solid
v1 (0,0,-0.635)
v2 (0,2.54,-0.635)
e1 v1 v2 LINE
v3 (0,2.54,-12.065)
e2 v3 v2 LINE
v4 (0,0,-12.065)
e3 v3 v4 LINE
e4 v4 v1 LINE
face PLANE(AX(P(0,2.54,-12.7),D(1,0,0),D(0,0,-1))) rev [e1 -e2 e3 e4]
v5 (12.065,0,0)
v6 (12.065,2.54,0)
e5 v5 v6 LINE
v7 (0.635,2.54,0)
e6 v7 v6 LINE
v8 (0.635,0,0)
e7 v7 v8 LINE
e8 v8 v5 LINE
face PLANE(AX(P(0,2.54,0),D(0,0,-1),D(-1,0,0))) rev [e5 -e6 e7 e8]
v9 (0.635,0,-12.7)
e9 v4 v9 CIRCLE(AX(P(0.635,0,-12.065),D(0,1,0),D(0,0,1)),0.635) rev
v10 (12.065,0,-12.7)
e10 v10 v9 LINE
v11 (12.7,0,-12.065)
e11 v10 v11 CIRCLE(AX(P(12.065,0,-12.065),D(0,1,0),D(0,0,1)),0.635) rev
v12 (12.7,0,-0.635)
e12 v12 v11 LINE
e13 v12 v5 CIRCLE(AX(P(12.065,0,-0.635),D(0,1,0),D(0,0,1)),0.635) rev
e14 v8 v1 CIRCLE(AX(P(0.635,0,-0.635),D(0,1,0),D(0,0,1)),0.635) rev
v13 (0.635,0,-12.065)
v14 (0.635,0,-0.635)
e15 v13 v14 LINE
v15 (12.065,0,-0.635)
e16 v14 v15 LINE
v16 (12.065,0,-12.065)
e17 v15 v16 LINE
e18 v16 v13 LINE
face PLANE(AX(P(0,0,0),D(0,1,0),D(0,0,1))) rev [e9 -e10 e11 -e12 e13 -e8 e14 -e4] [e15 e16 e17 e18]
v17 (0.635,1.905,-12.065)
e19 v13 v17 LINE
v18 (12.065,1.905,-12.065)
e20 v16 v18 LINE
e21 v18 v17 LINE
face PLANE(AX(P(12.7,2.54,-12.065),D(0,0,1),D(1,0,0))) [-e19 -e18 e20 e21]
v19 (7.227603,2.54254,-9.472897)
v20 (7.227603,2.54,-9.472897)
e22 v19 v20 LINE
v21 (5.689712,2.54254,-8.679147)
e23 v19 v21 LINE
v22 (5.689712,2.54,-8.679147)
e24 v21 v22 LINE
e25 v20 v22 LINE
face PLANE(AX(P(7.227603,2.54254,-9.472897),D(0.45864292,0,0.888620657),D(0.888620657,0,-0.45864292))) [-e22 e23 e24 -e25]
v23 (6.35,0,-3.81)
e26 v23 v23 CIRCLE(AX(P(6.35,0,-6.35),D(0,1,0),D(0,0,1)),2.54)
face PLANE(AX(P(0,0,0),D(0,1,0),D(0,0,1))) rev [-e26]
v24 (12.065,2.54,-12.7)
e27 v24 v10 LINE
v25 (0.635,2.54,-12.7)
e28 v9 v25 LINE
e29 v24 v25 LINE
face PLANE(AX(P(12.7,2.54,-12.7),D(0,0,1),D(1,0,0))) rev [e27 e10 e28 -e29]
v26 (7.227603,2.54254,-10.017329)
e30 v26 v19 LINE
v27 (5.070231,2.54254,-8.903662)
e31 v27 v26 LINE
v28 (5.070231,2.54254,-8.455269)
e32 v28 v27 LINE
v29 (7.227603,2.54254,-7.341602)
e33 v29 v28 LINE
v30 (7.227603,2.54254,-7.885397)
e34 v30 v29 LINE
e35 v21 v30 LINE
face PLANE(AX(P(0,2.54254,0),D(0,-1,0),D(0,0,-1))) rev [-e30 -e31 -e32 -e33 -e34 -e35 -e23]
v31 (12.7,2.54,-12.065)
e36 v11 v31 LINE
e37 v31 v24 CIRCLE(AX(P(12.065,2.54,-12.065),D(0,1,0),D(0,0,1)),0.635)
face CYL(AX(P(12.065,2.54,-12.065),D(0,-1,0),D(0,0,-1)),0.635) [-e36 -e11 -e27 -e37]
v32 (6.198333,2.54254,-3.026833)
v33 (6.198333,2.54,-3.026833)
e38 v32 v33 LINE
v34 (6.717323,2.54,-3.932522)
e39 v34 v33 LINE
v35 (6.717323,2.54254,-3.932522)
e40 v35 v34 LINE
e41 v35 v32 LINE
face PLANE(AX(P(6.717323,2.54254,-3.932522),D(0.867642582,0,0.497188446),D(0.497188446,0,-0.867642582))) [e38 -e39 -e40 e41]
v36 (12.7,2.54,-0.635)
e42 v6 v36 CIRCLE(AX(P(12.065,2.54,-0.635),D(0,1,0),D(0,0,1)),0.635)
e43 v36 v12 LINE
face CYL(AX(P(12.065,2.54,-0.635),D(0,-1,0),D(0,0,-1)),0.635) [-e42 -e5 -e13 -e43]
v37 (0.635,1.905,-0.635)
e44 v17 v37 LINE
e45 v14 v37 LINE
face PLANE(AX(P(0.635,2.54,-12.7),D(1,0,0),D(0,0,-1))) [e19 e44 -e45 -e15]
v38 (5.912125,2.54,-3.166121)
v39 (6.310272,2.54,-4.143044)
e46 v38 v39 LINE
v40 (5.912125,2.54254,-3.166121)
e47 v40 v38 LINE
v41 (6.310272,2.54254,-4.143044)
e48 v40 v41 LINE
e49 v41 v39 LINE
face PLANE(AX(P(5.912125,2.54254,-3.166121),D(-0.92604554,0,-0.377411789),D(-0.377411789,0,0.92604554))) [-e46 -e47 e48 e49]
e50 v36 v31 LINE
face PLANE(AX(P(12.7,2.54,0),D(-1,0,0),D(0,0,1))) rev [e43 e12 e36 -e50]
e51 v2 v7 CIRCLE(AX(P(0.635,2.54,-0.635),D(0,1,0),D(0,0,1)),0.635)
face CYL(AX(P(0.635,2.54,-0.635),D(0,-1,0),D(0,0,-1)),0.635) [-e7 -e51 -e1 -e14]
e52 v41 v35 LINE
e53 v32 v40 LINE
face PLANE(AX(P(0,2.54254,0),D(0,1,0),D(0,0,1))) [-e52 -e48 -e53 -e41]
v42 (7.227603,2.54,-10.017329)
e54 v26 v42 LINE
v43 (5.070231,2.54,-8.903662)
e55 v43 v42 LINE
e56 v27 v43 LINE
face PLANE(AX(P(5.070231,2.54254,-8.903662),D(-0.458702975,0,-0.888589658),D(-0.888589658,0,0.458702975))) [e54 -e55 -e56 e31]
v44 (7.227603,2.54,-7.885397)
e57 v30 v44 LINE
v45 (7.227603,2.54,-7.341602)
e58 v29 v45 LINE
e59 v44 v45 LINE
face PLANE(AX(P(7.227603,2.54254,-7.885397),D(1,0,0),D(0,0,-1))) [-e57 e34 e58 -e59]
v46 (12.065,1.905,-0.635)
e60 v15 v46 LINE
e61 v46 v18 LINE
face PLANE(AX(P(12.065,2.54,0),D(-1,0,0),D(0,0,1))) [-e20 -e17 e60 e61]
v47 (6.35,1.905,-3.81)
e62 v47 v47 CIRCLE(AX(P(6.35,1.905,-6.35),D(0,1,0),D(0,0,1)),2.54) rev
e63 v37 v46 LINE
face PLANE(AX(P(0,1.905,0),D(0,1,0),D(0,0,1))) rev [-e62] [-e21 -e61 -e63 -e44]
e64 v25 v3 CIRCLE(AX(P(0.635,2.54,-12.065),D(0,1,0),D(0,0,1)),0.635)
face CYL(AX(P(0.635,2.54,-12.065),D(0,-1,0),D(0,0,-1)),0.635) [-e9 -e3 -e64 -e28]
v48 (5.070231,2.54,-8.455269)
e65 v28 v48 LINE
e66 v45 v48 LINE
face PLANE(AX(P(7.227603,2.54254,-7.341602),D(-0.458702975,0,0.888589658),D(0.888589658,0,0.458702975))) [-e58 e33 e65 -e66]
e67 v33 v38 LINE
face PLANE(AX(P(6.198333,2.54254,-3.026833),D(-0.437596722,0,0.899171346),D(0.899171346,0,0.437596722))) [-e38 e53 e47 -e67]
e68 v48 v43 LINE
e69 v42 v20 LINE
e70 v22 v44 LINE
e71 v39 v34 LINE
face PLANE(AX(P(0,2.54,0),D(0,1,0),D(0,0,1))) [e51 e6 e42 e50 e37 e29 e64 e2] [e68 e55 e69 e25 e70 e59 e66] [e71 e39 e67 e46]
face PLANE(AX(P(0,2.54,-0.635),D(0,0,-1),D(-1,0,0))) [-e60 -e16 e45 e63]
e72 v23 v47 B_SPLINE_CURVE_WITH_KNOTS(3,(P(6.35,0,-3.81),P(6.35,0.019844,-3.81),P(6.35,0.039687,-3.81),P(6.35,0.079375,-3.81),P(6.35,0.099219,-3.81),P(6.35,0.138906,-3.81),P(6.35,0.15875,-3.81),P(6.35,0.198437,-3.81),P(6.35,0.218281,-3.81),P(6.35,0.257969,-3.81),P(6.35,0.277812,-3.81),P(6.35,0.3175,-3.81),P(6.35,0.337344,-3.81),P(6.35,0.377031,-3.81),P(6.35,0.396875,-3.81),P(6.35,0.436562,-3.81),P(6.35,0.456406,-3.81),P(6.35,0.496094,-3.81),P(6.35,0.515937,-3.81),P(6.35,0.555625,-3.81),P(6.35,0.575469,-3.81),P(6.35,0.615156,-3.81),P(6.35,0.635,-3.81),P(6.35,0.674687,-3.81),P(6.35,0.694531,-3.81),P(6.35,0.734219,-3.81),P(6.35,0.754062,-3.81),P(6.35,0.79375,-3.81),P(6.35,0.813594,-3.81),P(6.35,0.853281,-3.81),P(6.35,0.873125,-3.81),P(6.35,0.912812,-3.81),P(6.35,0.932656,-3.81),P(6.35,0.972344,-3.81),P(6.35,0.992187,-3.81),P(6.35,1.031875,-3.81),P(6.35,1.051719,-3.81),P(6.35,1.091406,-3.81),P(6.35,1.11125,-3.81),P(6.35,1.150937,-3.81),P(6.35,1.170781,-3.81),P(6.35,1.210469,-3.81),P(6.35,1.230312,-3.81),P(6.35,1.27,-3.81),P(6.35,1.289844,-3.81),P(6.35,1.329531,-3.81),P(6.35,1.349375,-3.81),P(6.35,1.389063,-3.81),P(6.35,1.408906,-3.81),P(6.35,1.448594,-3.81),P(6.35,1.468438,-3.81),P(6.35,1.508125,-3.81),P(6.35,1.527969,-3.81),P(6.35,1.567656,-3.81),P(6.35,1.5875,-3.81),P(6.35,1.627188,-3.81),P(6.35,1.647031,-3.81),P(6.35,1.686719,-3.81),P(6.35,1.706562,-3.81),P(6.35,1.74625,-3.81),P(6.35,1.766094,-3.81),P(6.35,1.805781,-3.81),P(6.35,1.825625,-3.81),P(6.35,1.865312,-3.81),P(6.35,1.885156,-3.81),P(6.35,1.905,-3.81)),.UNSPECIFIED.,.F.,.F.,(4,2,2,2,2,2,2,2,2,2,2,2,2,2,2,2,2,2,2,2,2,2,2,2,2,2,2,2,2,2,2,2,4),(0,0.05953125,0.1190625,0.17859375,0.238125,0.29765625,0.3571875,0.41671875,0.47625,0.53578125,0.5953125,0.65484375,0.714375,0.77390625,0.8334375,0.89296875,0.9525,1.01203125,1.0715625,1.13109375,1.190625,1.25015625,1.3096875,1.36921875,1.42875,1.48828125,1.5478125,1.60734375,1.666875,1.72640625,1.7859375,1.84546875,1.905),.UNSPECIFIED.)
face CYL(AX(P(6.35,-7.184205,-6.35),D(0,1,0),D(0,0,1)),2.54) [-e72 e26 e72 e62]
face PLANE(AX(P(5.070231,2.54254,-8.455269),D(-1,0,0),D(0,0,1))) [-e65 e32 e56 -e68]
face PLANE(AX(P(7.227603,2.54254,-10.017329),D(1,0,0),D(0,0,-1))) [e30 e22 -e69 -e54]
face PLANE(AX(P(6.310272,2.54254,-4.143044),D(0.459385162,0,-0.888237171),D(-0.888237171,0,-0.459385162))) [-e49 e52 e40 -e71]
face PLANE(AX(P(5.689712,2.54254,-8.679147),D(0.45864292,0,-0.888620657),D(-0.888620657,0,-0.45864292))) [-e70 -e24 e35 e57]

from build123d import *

# Parameters (mm, degrees)
SKETCH1_W           = 12.7
SKETCH1_H           = 12.7
BOSS_EXTRUDE1_DEPTH = 2.54
FILLET1_R           = 0.635
SHELL1_START        = 0.635
SHELL1_OUTLINE_W    = 1.905
SHELL1_OUTLINE_H    = 11.43
SHELL1_DEPTH        = 11.43
SKETCH2_R           = 2.54
BOSS_EXTRUDE2_DEPTH = 1.905
BOSS_EXTRUDE3_DEPTH = 0.00254


# Read off the part's stored shape, not the designer's step: Shell1
with BuildPart() as part:
    # Sketch1 → Boss-Extrude1 (new body)
    with BuildSketch(Plane(origin=(0, 0, 0), x_dir=(1, 0, 0), z_dir=(0, 1, 0))):
        with Locations((6.35, 6.35)):
            Rectangle(SKETCH1_W, SKETCH1_H)
    extrude(amount=BOSS_EXTRUDE1_DEPTH)

    # Fillet1
    fillet1_edges = [part.edges().sort_by_distance(p)[0] for p in [
        (0, 1.27, -12.7),
        (12.7, 1.27, -12.7),
        (12.7, 1.27, 0),
        (0, 1.27, 0),
    ]]
    fillet(fillet1_edges, radius=FILLET1_R)

    # Shell1 outline → Shell1 (cut)
    with BuildSketch(Plane.YZ.offset(SHELL1_START)):
        with Locations((0.9525, -6.35)):
            Rectangle(SHELL1_OUTLINE_W, SHELL1_OUTLINE_H)
    extrude(amount=SHELL1_DEPTH, mode=Mode.SUBTRACT)

    # Sketch2 → Boss-Extrude2 (add)
    with BuildSketch(Plane(origin=(0, 1.905, 0), x_dir=(-1, 0, 0), z_dir=(0, -1, 0))):
        with Locations(Location((-6.35, 6.35, 0), (0, 0, 270))):
            Circle(SKETCH2_R)
    extrude(amount=BOSS_EXTRUDE2_DEPTH)

    # Sketch3 → Boss-Extrude3 (add)
    with BuildSketch(Plane(origin=(0, 2.54, 0), x_dir=(1, 0, 0), z_dir=(0, 1, 0))):
        Polygon((7.227602564, 7.885397436), (7.227602564, 7.341602364), (5.070230769, 8.455269231), (5.070230769, 8.903661659), (7.227602564, 10.017328526), (7.227602564, 9.472897436), (5.689711939, 8.679147436), align=None)
        Polygon((6.310271795, 4.143044271), (6.717323077, 3.932522436), (6.198332692, 3.026833333), (5.91212476, 3.166121194), align=None)
    extrude(amount=BOSS_EXTRUDE3_DEPTH)


solid = part.part
